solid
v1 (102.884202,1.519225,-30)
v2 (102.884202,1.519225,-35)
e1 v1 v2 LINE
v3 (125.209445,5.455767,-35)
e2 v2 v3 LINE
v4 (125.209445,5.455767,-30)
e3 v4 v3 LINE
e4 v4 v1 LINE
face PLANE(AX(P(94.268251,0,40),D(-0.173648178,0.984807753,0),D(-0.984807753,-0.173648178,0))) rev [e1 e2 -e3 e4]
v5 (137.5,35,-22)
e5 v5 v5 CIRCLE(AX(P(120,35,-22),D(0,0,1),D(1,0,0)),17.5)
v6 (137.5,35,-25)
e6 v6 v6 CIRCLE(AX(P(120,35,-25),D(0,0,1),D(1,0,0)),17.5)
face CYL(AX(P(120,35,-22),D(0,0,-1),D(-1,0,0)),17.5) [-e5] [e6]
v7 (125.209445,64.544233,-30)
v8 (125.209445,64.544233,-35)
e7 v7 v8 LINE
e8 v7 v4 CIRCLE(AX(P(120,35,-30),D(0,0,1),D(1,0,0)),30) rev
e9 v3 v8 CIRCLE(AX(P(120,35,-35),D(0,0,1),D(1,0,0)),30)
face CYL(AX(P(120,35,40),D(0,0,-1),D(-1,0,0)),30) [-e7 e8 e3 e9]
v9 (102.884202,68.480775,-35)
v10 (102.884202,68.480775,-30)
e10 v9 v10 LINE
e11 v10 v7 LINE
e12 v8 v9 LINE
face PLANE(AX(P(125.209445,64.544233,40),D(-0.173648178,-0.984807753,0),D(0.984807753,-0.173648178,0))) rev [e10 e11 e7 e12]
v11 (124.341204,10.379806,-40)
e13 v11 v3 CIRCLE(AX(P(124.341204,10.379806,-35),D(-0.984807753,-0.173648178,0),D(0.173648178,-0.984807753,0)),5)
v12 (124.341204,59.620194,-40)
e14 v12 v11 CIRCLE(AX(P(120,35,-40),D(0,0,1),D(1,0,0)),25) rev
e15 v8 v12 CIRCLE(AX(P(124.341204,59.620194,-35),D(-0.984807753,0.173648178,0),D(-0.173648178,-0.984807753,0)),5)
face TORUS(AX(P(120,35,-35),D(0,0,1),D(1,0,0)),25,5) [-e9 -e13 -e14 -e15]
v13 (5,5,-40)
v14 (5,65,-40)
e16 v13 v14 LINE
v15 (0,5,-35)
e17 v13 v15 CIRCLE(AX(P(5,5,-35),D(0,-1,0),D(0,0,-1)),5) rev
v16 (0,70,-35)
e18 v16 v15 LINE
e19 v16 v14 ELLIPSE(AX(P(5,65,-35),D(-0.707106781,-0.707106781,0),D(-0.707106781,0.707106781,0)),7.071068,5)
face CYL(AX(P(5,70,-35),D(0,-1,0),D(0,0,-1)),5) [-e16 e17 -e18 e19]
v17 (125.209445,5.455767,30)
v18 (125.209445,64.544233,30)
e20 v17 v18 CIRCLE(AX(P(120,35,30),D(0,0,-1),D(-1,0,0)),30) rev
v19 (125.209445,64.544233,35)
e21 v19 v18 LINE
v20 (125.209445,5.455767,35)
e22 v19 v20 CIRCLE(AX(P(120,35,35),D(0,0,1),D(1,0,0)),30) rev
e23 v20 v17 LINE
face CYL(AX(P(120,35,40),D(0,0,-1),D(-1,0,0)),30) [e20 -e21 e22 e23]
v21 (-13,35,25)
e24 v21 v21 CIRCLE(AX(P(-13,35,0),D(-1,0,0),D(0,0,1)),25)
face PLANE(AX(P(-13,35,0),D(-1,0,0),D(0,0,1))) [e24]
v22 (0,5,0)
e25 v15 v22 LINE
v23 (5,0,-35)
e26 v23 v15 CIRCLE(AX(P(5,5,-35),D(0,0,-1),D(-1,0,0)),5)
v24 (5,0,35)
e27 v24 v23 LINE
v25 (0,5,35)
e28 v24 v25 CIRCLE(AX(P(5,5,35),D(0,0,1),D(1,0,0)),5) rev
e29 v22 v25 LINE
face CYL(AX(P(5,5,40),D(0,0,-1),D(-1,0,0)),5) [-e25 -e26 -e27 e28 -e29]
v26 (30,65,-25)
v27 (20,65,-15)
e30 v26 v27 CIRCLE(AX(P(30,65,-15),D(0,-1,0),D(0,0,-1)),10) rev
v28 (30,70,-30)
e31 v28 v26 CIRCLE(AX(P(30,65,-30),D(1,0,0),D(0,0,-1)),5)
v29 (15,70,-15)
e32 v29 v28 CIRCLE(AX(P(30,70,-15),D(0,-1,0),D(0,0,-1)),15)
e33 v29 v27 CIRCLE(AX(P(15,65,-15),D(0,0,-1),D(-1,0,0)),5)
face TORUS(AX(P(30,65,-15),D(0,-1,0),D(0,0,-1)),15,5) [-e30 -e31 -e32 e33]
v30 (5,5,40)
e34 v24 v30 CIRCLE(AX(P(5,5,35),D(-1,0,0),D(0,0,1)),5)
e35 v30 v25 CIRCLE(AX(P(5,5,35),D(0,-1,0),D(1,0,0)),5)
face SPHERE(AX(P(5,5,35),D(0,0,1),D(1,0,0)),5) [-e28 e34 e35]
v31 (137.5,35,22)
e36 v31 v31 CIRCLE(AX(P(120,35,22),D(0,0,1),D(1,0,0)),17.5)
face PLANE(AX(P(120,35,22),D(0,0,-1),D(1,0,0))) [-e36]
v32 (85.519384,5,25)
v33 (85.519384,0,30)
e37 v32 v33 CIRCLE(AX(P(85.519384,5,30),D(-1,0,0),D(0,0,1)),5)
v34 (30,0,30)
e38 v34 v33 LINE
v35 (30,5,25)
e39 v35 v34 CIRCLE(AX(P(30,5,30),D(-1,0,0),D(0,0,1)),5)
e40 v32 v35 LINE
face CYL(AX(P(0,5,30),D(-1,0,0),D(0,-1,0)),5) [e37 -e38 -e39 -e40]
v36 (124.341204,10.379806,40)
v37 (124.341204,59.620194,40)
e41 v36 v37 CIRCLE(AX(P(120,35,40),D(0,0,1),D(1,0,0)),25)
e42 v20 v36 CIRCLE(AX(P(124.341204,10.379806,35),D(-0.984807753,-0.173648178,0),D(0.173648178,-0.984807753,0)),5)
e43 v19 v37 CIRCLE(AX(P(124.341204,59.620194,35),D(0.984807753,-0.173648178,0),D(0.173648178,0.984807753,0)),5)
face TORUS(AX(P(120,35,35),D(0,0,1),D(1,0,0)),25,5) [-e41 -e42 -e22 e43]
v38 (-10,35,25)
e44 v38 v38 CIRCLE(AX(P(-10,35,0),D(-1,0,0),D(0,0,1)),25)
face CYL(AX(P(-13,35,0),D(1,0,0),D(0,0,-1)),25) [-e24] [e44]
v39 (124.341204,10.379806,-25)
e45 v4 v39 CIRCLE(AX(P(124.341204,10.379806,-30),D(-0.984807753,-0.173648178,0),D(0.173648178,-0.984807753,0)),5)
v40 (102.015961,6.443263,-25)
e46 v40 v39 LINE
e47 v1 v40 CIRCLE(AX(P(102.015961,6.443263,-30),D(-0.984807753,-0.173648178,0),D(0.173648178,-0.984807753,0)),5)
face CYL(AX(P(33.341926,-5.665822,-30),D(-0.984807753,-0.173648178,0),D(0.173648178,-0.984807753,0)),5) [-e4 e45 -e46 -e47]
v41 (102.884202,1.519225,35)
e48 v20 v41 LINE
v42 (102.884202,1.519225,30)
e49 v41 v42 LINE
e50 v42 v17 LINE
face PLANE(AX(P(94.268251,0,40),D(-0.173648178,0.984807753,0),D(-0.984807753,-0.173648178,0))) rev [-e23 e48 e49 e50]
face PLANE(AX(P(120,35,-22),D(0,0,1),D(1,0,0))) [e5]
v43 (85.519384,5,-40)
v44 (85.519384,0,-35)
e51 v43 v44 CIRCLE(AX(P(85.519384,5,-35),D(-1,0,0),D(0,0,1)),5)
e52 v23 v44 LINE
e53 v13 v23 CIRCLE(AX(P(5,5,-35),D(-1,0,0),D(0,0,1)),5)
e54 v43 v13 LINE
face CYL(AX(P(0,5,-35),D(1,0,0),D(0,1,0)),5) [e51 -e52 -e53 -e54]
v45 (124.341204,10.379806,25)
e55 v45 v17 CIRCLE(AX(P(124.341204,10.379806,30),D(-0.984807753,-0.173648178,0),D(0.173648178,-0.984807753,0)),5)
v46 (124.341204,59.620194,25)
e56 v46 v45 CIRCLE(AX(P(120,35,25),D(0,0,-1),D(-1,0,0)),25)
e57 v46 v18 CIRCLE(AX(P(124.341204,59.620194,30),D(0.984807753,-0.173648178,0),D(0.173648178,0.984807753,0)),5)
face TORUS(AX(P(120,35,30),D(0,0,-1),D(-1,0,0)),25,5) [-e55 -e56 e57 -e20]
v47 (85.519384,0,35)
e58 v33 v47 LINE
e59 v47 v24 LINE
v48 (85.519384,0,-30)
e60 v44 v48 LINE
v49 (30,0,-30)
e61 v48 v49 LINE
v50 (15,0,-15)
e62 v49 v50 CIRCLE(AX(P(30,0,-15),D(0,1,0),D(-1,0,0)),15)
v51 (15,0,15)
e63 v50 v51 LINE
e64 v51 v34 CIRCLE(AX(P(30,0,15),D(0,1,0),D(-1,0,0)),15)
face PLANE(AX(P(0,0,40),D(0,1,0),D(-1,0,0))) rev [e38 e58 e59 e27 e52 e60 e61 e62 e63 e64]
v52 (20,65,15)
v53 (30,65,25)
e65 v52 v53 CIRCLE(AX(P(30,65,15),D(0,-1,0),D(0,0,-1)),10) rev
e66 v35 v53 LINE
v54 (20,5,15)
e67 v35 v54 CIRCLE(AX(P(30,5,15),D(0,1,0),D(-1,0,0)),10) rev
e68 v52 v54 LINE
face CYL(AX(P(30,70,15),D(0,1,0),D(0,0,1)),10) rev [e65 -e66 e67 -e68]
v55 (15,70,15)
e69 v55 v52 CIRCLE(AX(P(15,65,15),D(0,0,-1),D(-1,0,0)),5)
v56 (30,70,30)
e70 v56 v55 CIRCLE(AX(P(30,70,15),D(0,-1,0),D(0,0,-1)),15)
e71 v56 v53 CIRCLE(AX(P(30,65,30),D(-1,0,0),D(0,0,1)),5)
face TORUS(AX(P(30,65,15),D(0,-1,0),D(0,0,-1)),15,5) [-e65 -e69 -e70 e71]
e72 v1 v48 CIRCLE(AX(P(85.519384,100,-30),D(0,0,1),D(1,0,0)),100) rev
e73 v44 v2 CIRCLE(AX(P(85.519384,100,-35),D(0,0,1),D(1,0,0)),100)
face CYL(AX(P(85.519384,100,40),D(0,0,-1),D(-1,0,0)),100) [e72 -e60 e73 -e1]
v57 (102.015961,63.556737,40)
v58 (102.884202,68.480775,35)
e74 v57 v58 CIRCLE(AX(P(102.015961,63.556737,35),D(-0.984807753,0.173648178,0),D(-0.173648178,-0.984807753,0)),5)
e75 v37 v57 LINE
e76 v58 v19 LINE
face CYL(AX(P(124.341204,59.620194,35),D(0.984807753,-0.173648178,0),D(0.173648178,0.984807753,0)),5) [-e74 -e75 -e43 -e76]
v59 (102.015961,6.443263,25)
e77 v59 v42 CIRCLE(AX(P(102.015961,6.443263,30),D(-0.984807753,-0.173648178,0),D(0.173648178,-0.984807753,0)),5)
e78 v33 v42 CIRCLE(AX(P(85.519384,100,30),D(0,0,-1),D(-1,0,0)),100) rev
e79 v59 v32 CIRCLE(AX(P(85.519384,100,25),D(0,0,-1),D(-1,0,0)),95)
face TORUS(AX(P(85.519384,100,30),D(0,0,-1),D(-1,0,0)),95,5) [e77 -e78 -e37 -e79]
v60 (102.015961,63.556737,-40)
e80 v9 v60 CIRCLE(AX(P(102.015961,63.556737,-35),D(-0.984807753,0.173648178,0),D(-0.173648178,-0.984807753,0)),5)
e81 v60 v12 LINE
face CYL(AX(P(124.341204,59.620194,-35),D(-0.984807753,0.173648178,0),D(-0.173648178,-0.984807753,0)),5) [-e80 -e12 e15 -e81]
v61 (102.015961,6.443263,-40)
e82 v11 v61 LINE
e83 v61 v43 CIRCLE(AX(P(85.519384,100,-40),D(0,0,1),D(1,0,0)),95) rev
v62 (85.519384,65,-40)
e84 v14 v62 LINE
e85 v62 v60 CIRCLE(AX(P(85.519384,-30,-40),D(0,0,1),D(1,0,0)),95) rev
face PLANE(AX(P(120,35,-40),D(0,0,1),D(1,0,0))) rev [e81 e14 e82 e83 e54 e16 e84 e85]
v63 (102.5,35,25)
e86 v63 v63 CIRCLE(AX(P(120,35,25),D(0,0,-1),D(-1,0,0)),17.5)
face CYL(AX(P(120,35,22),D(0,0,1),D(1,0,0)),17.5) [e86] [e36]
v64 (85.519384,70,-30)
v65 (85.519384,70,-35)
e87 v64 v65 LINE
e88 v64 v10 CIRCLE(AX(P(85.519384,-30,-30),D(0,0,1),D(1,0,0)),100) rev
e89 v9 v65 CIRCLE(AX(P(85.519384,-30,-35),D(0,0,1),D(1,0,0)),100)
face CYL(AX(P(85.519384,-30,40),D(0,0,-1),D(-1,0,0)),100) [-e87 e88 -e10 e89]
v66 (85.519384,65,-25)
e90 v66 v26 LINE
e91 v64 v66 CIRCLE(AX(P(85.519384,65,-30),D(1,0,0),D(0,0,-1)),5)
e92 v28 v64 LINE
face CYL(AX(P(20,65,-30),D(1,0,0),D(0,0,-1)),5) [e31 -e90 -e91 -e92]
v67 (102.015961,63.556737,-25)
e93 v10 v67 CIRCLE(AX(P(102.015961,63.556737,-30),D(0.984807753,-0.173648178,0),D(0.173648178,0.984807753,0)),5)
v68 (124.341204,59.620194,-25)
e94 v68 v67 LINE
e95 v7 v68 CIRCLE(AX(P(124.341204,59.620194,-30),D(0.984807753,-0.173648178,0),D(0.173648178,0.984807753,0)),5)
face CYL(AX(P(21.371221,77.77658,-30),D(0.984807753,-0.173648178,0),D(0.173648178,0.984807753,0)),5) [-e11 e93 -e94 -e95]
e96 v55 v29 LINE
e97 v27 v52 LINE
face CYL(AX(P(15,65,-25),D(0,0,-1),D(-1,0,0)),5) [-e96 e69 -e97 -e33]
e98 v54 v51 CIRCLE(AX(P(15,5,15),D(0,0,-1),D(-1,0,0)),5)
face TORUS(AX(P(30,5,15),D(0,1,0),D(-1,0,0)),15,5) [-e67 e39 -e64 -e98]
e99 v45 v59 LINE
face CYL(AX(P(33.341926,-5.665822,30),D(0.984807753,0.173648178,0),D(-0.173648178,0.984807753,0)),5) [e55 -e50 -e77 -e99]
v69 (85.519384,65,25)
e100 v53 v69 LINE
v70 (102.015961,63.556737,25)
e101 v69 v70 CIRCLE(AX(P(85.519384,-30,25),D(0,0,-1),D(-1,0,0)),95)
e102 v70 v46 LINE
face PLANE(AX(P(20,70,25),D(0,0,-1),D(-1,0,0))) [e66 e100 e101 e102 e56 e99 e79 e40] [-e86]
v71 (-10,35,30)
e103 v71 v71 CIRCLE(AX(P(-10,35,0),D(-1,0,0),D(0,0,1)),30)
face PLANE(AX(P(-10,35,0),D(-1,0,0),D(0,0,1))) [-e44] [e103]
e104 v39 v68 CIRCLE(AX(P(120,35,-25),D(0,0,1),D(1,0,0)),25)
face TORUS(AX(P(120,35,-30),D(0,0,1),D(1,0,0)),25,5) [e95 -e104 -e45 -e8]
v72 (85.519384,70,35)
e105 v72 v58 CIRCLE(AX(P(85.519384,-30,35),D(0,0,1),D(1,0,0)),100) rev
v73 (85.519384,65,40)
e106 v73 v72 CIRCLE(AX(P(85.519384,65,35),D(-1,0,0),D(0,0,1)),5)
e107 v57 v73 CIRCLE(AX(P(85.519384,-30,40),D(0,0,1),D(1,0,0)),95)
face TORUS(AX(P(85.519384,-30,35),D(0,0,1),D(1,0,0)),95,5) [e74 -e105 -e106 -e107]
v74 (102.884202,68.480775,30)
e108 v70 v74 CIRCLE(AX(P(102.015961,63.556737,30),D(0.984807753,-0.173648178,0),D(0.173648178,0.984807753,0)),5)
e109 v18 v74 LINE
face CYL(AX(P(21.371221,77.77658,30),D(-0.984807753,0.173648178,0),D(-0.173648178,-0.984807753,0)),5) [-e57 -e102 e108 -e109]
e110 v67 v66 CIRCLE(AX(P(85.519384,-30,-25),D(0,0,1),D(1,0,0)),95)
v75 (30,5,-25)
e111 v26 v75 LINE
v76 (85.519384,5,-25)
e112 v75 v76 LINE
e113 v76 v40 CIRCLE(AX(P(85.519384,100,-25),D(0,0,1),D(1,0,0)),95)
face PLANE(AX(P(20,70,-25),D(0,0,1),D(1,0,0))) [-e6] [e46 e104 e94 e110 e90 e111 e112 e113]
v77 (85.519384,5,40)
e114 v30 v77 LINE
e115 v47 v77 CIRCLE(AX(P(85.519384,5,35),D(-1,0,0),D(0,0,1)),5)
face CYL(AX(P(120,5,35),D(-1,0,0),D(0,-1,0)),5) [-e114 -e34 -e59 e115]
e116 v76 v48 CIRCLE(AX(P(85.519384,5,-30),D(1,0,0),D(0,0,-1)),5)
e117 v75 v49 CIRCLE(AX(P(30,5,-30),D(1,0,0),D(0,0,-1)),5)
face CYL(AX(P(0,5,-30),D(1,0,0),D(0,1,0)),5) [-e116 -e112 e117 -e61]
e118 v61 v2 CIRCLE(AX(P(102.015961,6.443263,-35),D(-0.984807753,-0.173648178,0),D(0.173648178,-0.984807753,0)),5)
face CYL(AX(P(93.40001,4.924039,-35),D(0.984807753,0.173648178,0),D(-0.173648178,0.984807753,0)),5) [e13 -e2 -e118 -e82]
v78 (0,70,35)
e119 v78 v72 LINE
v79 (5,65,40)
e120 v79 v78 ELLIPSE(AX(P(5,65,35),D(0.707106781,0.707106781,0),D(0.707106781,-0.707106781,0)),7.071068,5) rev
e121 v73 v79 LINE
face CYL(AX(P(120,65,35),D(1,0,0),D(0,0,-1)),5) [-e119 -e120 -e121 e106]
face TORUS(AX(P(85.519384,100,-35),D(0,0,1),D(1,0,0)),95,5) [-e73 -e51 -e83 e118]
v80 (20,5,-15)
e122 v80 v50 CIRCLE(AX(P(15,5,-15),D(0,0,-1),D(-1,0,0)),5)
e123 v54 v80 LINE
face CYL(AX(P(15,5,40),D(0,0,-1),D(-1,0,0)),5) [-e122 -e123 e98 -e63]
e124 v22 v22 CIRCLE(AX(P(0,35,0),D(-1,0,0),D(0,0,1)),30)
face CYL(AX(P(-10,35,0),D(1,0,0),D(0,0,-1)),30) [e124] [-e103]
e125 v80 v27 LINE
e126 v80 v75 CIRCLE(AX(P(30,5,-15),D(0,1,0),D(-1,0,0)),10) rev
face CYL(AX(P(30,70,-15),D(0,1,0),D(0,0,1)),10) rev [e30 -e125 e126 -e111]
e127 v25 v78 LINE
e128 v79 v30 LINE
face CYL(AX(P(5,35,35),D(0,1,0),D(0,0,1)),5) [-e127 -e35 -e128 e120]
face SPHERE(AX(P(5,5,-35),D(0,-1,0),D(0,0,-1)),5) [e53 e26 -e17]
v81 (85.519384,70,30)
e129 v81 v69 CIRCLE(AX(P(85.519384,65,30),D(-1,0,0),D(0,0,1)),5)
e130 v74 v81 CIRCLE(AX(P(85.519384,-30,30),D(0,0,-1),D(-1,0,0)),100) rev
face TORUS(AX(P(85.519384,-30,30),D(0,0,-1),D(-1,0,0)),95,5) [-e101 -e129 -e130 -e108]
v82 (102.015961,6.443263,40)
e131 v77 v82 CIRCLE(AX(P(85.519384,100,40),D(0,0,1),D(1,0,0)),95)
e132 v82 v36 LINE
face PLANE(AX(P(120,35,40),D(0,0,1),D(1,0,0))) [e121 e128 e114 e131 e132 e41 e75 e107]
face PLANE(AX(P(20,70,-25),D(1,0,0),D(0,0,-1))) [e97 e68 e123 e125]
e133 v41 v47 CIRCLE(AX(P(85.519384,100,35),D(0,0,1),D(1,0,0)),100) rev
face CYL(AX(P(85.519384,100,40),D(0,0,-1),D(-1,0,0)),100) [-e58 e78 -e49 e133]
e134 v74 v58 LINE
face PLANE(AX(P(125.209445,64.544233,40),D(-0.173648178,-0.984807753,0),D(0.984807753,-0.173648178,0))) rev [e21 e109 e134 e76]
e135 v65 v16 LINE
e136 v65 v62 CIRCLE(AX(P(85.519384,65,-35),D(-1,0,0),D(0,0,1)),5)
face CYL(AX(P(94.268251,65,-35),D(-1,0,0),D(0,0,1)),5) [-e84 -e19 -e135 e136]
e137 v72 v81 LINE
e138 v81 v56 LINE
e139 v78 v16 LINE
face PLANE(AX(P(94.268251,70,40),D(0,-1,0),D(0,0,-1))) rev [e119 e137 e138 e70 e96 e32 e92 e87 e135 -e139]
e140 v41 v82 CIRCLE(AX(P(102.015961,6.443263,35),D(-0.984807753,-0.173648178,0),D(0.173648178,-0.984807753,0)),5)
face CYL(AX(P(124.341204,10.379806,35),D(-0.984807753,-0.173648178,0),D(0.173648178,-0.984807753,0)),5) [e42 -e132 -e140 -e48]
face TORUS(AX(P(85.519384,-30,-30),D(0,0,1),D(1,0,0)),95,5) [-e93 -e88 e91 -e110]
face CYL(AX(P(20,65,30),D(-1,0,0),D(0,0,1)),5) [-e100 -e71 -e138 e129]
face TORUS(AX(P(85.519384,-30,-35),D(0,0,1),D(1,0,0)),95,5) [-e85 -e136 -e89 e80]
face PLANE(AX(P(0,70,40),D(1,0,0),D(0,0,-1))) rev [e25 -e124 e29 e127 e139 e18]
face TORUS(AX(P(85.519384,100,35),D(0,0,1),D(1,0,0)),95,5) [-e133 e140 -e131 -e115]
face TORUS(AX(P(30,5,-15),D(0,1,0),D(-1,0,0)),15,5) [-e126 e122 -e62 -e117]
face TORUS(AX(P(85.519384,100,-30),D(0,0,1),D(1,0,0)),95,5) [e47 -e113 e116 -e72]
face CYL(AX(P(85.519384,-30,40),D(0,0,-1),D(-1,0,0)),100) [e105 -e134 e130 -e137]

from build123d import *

# Parameters (mm, degrees)
BOSS_EXTRUDE1_DEPTH = 40
SKETCH2_W           = 180
SKETCH2_H           = 50
CUT_EXTRUDE1_DEPTH  = 171.293863659
SKETCH3_R           = 17.5
BOSS_EXTRUDE3_DEPTH = 3
SKETCH4_R           = 30
BOSS_EXTRUDE4_DEPTH = 10
SKETCH5_R           = 25
BOSS_EXTRUDE5_DEPTH = 3
FILLET2_R           = 100
FILLET3_R           = 10
FILLET4_R           = 5


with BuildPart() as part:
    # Sketch1 → Boss-Extrude1 (new, symmetric)
    with BuildSketch(Plane.XY):
        with BuildLine():
            Line((0, 0), (94.268250808, 0))
            Line((94.268250808, 0), (125.20944533, 5.45576741))
            ThreePointArc((125.20944533, 5.45576741), (150, 35), (125.20944533, 64.54423259))
            Line((125.20944533, 64.54423259), (94.268250808, 70))
            Line((94.268250808, 70), (0, 70))
            Line((0, 70), (0, 0))
        make_face()
    extrude(amount=BOSS_EXTRUDE1_DEPTH, both=True)

    # Sketch2 → Cut-Extrude1 (cut, through all)
    with BuildSketch(Plane(origin=(0, 0, 0), x_dir=(1, 0, 0), z_dir=(0, 1, 0))):
        with Locations((110, 0)):
            Rectangle(SKETCH2_W, SKETCH2_H)
    extrude(amount=CUT_EXTRUDE1_DEPTH, mode=Mode.SUBTRACT)

    # Sketch3 → Boss-Extrude3 (add)
    with BuildSketch(Plane.XY.offset(-25)):
        with Locations((120, 35)):
            Circle(SKETCH3_R)
    boss_extrude3 = extrude(amount=BOSS_EXTRUDE3_DEPTH)

    # Mirror1: Boss-Extrude3 across plane
    add(boss_extrude3.mirror(Plane.XY))

    # Sketch4 → Boss-Extrude4 (add)
    with BuildSketch(Plane.ZY):
        with Locations((0, 35)):
            Circle(SKETCH4_R)
    extrude(amount=BOSS_EXTRUDE4_DEPTH)

    # Sketch5 → Boss-Extrude5 (add)
    with BuildSketch(Plane.ZY.offset(10)):
        with Locations((0, 35)):
            Circle(SKETCH5_R)
    extrude(amount=BOSS_EXTRUDE5_DEPTH)

    # Fillet2
    fillet2_edges = [part.edges().sort_by_distance(p)[0] for p in [
        (94.268250808, 70, 32.5),
        (94.268250808, 0, 32.5),
        (94.268250808, 70, -32.5),
        (94.268250808, 0, -32.5),
    ]]
    fillet(fillet2_edges, radius=FILLET2_R)

    # Fillet3
    fillet3_edges = [part.edges().sort_by_distance(p)[0] for p in [
        (20, 35, 25),
        (20, 35, -25),
    ]]
    fillet(fillet3_edges, radius=FILLET3_R)

    # Fillet4
    fillet4_edges = [part.edges().sort_by_distance(p)[0] for p in [
        (0, 0, 0),
        (150, 35, 40),
        (114.046823776, 66.512503946, 40),
        (150, 35, 25),
        (114.046823776, 3.487496054, 25),
        (150, 35, -25),
        (114.046823776, 66.512503946, -25),
        (0, 35, 40),
        (57.759692228, 70, -25),
        (42.759692228, 70, -40),
        (42.759692228, 70, 40),
        (114.046823776, 3.487496054, -40),
        (94.23495873, 0.380530191, -40),
        (94.23495873, 69.619469809, -40),
        (114.046823776, 3.487496054, -25),
        (57.759692228, 0, -25),
        (94.23495873, 0.380530191, -25),
        (94.23495873, 69.619469809, -25),
        (114.046823776, 66.512503946, 25),
        (94.23495873, 0.380530191, 25),
        (94.23495873, 69.619469809, 25),
        (114.046823776, 3.487496054, 40),
        (94.23495873, 0.380530191, 40),
        (94.23495873, 69.619469809, 40),
        (114.046823776, 66.512503946, -40),
        (150, 35, -40),
        (42.759692228, 0, -40),
        (20, 0, 0),
        (20, 70, 0),
        (0, 35, -40),
        (57.759692228, 70, 25),
        (57.759692228, 0, 25),
        (42.759692228, 0, 40),
        (22.928932188, 0, 22.071067812),
        (22.928932188, 70, 22.071067812),
        (22.928932188, 0, -22.071067812),
        (22.928932188, 70, -22.071067812),
    ]]
    fillet(fillet4_edges, radius=FILLET4_R - 0.0001)  # a hair under: the kernel refuses the full size


solid = part.part
